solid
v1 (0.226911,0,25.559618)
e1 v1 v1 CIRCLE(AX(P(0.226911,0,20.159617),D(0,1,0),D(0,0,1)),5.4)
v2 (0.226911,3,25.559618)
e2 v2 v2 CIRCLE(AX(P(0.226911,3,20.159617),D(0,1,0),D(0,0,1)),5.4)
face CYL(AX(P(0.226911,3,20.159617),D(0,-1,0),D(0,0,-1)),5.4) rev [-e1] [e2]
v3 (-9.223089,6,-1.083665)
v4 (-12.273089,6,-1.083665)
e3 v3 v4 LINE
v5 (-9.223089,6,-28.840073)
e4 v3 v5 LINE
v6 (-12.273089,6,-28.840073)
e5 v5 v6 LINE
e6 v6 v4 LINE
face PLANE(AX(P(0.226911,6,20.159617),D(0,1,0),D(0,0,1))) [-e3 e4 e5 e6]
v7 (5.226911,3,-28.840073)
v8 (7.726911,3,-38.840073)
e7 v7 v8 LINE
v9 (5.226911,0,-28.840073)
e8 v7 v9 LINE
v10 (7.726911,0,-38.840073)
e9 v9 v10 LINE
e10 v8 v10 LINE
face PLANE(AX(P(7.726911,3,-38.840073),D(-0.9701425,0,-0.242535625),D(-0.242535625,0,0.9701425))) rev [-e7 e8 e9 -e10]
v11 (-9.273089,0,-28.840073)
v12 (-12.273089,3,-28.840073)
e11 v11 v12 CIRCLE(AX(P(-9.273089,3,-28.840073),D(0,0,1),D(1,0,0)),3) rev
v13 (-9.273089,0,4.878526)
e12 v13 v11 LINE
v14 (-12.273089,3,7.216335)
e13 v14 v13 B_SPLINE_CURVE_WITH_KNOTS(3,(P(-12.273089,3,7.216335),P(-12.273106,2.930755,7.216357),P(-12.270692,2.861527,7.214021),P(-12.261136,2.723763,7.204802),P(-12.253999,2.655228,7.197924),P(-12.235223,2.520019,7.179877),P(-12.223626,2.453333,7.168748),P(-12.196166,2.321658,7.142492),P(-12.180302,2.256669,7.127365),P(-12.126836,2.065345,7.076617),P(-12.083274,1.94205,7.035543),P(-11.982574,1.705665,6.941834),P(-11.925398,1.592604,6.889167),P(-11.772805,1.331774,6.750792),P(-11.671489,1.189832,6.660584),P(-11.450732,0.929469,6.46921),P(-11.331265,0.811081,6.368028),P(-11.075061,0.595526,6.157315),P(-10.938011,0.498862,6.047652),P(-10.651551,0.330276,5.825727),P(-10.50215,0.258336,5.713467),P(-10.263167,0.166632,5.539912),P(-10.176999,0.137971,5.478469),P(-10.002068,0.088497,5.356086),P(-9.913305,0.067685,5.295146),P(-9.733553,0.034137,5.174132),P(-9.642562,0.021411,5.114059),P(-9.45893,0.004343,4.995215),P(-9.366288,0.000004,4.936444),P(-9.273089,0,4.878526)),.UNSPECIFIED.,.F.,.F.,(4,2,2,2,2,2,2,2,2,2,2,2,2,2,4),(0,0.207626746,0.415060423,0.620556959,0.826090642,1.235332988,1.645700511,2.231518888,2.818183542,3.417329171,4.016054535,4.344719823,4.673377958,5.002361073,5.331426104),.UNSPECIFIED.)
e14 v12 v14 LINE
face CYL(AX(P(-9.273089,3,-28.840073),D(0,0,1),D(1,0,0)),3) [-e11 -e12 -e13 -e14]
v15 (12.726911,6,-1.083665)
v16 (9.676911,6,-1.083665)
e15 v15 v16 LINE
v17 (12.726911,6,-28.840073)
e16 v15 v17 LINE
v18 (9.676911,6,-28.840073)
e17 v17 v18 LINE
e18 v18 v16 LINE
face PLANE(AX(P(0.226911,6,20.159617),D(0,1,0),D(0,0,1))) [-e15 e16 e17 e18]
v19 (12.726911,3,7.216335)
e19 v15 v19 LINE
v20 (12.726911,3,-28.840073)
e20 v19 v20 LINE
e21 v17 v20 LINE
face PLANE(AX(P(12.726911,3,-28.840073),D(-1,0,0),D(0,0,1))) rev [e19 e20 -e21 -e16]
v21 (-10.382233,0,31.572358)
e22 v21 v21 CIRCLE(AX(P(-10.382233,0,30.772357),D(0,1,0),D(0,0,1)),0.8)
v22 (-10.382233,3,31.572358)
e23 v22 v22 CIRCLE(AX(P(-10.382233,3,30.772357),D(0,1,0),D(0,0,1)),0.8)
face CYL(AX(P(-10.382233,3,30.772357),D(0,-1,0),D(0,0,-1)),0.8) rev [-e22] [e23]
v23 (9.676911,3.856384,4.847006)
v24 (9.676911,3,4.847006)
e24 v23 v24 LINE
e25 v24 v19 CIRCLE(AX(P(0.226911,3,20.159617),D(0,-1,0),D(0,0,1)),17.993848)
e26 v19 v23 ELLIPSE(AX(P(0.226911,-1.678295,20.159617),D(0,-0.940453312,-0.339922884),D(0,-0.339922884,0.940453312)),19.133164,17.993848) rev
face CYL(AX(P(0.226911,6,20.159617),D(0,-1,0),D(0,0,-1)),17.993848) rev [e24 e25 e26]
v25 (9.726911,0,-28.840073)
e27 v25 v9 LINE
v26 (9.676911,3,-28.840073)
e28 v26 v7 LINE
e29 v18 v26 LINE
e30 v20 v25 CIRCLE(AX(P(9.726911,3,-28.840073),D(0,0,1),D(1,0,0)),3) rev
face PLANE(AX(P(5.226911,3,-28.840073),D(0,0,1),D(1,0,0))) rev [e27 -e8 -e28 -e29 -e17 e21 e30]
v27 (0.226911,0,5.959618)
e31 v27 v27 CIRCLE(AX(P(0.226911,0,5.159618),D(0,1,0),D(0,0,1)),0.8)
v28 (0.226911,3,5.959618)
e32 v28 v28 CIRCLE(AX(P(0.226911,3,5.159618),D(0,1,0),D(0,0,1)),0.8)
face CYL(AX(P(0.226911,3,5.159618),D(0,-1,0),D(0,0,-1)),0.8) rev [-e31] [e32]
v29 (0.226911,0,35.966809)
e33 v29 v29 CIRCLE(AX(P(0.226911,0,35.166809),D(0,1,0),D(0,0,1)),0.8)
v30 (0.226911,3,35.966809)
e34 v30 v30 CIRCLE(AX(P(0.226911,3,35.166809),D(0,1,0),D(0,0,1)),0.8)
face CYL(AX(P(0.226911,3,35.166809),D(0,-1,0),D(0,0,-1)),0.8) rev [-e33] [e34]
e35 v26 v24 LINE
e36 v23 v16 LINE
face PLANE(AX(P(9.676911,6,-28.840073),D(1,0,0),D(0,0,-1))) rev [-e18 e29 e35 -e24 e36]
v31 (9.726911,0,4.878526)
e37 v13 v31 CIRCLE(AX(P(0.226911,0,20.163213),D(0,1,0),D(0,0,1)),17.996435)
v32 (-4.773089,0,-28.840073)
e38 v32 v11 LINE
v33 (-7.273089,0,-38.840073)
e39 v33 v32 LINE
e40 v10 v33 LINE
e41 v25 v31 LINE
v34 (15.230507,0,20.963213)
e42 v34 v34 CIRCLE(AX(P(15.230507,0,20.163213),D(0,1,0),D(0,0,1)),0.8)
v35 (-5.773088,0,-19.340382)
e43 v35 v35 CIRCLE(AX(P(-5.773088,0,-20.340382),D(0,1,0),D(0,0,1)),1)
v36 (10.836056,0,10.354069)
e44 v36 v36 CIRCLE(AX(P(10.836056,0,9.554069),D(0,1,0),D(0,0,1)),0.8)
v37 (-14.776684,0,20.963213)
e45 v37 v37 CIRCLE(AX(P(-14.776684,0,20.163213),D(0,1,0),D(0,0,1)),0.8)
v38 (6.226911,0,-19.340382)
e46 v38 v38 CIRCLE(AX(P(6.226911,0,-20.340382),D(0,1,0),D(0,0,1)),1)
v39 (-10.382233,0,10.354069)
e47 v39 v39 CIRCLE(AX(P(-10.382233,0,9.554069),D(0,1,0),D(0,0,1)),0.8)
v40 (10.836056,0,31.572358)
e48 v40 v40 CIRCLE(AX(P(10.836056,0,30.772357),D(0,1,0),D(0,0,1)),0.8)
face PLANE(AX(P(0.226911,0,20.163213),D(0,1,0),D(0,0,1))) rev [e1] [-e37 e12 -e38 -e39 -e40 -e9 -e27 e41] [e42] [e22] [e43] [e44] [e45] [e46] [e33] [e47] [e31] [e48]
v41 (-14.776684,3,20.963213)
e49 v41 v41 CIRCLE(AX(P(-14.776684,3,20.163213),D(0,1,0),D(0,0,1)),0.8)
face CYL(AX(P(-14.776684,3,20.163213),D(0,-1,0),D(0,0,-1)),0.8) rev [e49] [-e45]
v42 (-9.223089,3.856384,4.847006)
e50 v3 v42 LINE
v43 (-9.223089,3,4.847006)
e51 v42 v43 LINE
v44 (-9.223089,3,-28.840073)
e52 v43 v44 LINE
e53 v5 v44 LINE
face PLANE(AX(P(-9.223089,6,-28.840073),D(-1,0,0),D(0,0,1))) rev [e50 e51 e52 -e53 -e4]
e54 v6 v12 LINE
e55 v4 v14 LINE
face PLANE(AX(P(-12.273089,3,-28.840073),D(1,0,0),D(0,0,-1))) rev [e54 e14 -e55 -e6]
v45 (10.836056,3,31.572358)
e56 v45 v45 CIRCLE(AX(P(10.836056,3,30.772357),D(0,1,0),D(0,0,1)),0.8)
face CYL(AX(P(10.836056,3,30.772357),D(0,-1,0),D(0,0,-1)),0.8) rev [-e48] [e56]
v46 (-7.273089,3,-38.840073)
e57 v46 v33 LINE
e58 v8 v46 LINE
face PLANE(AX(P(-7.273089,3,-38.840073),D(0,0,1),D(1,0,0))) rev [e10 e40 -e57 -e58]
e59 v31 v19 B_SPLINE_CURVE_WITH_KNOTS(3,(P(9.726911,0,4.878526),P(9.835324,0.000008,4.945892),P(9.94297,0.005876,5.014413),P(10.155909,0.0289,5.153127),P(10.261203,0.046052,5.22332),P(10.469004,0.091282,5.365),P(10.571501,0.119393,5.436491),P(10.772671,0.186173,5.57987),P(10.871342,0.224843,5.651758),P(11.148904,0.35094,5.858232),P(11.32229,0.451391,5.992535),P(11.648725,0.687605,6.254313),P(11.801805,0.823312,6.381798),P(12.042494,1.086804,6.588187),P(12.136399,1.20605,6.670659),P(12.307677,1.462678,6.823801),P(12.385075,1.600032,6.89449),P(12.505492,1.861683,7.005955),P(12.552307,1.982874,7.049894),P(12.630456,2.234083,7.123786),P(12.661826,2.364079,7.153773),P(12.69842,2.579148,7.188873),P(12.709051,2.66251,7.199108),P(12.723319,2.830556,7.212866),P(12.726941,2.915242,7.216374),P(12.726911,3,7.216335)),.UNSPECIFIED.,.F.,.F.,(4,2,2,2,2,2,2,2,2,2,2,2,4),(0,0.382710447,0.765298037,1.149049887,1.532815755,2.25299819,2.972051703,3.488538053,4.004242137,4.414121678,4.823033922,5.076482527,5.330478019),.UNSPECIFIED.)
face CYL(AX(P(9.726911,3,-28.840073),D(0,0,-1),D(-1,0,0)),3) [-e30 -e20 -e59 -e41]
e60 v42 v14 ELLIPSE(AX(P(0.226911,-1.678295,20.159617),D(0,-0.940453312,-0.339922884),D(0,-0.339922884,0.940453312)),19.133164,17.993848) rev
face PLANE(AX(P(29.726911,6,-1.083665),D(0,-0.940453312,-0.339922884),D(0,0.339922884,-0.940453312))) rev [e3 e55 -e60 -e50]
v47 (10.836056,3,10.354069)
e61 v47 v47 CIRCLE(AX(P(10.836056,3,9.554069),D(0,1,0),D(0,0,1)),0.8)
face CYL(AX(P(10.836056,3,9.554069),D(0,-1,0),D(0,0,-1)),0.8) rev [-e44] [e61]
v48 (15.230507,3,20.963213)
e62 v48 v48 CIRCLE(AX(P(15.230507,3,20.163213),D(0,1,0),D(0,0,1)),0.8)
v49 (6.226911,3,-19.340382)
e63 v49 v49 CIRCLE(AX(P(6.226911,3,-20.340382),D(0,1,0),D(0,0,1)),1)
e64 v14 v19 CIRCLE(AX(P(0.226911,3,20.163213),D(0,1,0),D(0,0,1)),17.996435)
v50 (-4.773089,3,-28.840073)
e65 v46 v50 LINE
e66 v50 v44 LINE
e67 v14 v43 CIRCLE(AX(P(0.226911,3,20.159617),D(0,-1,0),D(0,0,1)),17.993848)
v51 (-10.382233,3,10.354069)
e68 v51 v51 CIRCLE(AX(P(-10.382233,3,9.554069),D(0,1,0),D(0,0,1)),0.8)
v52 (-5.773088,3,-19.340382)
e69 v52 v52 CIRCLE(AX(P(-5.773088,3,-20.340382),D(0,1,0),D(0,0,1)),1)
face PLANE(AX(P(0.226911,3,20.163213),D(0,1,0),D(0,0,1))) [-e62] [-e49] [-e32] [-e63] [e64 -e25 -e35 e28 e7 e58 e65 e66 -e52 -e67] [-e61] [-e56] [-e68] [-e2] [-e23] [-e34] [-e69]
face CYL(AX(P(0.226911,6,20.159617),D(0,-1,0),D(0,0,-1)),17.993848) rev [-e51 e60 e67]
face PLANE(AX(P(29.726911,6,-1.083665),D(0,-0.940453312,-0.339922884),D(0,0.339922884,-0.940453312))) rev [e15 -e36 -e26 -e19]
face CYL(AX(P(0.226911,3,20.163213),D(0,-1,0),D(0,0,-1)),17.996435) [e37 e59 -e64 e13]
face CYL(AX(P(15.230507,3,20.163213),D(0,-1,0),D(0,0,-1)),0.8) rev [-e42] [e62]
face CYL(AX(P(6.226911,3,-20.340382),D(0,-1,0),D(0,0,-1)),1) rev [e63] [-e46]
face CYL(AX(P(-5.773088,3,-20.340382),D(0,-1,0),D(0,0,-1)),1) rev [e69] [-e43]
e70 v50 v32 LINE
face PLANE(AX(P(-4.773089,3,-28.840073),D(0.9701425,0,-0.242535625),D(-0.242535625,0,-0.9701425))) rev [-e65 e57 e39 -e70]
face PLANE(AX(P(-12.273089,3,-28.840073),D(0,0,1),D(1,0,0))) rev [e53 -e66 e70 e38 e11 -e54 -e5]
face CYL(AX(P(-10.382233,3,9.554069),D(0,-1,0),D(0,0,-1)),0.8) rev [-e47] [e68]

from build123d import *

# Parameters (mm, degrees)
CROQUIS1_R              = 5.400000088
CROQUIS1_R_2            = 0.999999877
CROQUIS1_R_3            = 1.000000024
CROQUIS1_R_4            = 0.800000203
SALIENTE_EXTRUIR1_DEPTH = 3
SALIENTE_EXTRUIR2_DEPTH = 3
CORTAR_EXTRUIR1_DEPTH   = 42
REDONDEO1_R             = 3


with BuildPart() as part:
    # Croquis1 → Saliente-Extruir1 (new body)
    with BuildSketch(Plane(origin=(0, 0, 0), x_dir=(1, 0, 0), z_dir=(0, 1, 0))):
        with BuildLine():
            Line((-12.273088561, 28.840073314), (-4.773088561, 28.840073314))
            Line((-4.773088561, 28.840073314), (-7.273088561, 38.840073314))
            Line((-7.273088561, 38.840073314), (7.726911439, 38.840073314))
            Line((7.726911439, 38.840073314), (5.226911439, 28.840073314))
            Line((5.226911439, 28.840073314), (12.726911439, 28.840073314))
            Line((12.726911439, 28.840073314), (12.726911439, -7.216334642))
            ThreePointArc((12.726911439, -7.216334642), (0.226911439, -38.159647961), (-12.273088561, -7.216334642))
            Line((-12.273088561, -7.216334642), (-12.273088561, 28.840073314))
        make_face()
        with Locations(Location((0.226911124, -20.159617436, 0), (0, 0, 270))):
            Circle(CROQUIS1_R, mode=Mode.SUBTRACT)
        with Locations(Location((6.226911439, 20.340382277, 0), (0, 0, 270))):
            Circle(CROQUIS1_R_2, mode=Mode.SUBTRACT)
        with Locations(Location((-5.77308837, 20.34038236, 0), (0, 0, 270))):
            Circle(CROQUIS1_R_3, mode=Mode.SUBTRACT)
        with Locations(Location((0.226911439, -5.159617656, 0), (0, 0, 270))):
            Circle(CROQUIS1_R_4, mode=Mode.SUBTRACT)
        with Locations(Location((10.836055587, -9.554069047, 0), (0, 0, 270))):
            Circle(CROQUIS1_R_4, mode=Mode.SUBTRACT)
        with Locations(Location((15.230506978, -20.163213195, 0), (0, 0, 270))):
            Circle(CROQUIS1_R_4, mode=Mode.SUBTRACT)
        with Locations(Location((10.836055587, -30.772357343, 0), (0, 0, 270))):
            Circle(CROQUIS1_R_4, mode=Mode.SUBTRACT)
        with Locations(Location((0.226911439, -35.166808735, 0), (0, 0, 270))):
            Circle(CROQUIS1_R_4, mode=Mode.SUBTRACT)
        with Locations(Location((-10.382232709, -30.772357343, 0), (0, 0, 270))):
            Circle(CROQUIS1_R_4, mode=Mode.SUBTRACT)
        with Locations(Location((-14.776684101, -20.163213195, 0), (0, 0, 270))):
            Circle(CROQUIS1_R_4, mode=Mode.SUBTRACT)
        with Locations(Location((-10.382232709, -9.554069047, 0), (0, 0, 270))):
            Circle(CROQUIS1_R_4, mode=Mode.SUBTRACT)
    extrude(amount=SALIENTE_EXTRUIR1_DEPTH)

    # Croquis2 → Saliente-Extruir2 (add)
    with BuildSketch(Plane(origin=(0, 3, 0), x_dir=(1, 0, 0), z_dir=(0, 1, 0))):
        with BuildLine():
            Line((-12.273088561, 28.840073314), (-9.223088561, 28.840073314))
            Line((-9.223088561, 28.840073314), (-9.223088561, -4.847006046))
            ThreePointArc((-9.223088561, -4.847006046), (-10.811840961, -5.949602868), (-12.273088561, -7.216334642))
            Line((-12.273088561, -7.216334642), (-12.273088561, 28.840073314))
        make_face()
        with BuildLine():
            Line((9.676910809, 28.840073314), (9.676910809, -4.847006046))
            ThreePointArc((9.676910809, -4.847006046), (11.265663208, -5.949602868), (12.726910809, -7.216334642))
            Line((12.726910809, -7.216334642), (12.726910809, 28.840073314))
            Line((12.726910809, 28.840073314), (9.676910809, 28.840073314))
        make_face()
    extrude(amount=SALIENTE_EXTRUIR2_DEPTH)

    # Croquis3 → Cortar-Extruir1 (cut)
    with BuildSketch(Plane.ZY.offset(12.273088561)):
        Polygon((-1.083665358, 6), (7.216334642, 3), (7.216334642, 6), align=None)
    extrude(amount=-CORTAR_EXTRUIR1_DEPTH, mode=Mode.SUBTRACT)

    # Redondeo1
    redondeo1_edges = [part.edges().sort_by_distance(p)[0] for p in [
        (12.726911439, 0, -10.811869336),
        (-12.273088561, 0, -10.811869336),
    ]]
    fillet(redondeo1_edges, radius=REDONDEO1_R - 0.0001)  # a hair under: the kernel refuses the full size


solid = part.part
